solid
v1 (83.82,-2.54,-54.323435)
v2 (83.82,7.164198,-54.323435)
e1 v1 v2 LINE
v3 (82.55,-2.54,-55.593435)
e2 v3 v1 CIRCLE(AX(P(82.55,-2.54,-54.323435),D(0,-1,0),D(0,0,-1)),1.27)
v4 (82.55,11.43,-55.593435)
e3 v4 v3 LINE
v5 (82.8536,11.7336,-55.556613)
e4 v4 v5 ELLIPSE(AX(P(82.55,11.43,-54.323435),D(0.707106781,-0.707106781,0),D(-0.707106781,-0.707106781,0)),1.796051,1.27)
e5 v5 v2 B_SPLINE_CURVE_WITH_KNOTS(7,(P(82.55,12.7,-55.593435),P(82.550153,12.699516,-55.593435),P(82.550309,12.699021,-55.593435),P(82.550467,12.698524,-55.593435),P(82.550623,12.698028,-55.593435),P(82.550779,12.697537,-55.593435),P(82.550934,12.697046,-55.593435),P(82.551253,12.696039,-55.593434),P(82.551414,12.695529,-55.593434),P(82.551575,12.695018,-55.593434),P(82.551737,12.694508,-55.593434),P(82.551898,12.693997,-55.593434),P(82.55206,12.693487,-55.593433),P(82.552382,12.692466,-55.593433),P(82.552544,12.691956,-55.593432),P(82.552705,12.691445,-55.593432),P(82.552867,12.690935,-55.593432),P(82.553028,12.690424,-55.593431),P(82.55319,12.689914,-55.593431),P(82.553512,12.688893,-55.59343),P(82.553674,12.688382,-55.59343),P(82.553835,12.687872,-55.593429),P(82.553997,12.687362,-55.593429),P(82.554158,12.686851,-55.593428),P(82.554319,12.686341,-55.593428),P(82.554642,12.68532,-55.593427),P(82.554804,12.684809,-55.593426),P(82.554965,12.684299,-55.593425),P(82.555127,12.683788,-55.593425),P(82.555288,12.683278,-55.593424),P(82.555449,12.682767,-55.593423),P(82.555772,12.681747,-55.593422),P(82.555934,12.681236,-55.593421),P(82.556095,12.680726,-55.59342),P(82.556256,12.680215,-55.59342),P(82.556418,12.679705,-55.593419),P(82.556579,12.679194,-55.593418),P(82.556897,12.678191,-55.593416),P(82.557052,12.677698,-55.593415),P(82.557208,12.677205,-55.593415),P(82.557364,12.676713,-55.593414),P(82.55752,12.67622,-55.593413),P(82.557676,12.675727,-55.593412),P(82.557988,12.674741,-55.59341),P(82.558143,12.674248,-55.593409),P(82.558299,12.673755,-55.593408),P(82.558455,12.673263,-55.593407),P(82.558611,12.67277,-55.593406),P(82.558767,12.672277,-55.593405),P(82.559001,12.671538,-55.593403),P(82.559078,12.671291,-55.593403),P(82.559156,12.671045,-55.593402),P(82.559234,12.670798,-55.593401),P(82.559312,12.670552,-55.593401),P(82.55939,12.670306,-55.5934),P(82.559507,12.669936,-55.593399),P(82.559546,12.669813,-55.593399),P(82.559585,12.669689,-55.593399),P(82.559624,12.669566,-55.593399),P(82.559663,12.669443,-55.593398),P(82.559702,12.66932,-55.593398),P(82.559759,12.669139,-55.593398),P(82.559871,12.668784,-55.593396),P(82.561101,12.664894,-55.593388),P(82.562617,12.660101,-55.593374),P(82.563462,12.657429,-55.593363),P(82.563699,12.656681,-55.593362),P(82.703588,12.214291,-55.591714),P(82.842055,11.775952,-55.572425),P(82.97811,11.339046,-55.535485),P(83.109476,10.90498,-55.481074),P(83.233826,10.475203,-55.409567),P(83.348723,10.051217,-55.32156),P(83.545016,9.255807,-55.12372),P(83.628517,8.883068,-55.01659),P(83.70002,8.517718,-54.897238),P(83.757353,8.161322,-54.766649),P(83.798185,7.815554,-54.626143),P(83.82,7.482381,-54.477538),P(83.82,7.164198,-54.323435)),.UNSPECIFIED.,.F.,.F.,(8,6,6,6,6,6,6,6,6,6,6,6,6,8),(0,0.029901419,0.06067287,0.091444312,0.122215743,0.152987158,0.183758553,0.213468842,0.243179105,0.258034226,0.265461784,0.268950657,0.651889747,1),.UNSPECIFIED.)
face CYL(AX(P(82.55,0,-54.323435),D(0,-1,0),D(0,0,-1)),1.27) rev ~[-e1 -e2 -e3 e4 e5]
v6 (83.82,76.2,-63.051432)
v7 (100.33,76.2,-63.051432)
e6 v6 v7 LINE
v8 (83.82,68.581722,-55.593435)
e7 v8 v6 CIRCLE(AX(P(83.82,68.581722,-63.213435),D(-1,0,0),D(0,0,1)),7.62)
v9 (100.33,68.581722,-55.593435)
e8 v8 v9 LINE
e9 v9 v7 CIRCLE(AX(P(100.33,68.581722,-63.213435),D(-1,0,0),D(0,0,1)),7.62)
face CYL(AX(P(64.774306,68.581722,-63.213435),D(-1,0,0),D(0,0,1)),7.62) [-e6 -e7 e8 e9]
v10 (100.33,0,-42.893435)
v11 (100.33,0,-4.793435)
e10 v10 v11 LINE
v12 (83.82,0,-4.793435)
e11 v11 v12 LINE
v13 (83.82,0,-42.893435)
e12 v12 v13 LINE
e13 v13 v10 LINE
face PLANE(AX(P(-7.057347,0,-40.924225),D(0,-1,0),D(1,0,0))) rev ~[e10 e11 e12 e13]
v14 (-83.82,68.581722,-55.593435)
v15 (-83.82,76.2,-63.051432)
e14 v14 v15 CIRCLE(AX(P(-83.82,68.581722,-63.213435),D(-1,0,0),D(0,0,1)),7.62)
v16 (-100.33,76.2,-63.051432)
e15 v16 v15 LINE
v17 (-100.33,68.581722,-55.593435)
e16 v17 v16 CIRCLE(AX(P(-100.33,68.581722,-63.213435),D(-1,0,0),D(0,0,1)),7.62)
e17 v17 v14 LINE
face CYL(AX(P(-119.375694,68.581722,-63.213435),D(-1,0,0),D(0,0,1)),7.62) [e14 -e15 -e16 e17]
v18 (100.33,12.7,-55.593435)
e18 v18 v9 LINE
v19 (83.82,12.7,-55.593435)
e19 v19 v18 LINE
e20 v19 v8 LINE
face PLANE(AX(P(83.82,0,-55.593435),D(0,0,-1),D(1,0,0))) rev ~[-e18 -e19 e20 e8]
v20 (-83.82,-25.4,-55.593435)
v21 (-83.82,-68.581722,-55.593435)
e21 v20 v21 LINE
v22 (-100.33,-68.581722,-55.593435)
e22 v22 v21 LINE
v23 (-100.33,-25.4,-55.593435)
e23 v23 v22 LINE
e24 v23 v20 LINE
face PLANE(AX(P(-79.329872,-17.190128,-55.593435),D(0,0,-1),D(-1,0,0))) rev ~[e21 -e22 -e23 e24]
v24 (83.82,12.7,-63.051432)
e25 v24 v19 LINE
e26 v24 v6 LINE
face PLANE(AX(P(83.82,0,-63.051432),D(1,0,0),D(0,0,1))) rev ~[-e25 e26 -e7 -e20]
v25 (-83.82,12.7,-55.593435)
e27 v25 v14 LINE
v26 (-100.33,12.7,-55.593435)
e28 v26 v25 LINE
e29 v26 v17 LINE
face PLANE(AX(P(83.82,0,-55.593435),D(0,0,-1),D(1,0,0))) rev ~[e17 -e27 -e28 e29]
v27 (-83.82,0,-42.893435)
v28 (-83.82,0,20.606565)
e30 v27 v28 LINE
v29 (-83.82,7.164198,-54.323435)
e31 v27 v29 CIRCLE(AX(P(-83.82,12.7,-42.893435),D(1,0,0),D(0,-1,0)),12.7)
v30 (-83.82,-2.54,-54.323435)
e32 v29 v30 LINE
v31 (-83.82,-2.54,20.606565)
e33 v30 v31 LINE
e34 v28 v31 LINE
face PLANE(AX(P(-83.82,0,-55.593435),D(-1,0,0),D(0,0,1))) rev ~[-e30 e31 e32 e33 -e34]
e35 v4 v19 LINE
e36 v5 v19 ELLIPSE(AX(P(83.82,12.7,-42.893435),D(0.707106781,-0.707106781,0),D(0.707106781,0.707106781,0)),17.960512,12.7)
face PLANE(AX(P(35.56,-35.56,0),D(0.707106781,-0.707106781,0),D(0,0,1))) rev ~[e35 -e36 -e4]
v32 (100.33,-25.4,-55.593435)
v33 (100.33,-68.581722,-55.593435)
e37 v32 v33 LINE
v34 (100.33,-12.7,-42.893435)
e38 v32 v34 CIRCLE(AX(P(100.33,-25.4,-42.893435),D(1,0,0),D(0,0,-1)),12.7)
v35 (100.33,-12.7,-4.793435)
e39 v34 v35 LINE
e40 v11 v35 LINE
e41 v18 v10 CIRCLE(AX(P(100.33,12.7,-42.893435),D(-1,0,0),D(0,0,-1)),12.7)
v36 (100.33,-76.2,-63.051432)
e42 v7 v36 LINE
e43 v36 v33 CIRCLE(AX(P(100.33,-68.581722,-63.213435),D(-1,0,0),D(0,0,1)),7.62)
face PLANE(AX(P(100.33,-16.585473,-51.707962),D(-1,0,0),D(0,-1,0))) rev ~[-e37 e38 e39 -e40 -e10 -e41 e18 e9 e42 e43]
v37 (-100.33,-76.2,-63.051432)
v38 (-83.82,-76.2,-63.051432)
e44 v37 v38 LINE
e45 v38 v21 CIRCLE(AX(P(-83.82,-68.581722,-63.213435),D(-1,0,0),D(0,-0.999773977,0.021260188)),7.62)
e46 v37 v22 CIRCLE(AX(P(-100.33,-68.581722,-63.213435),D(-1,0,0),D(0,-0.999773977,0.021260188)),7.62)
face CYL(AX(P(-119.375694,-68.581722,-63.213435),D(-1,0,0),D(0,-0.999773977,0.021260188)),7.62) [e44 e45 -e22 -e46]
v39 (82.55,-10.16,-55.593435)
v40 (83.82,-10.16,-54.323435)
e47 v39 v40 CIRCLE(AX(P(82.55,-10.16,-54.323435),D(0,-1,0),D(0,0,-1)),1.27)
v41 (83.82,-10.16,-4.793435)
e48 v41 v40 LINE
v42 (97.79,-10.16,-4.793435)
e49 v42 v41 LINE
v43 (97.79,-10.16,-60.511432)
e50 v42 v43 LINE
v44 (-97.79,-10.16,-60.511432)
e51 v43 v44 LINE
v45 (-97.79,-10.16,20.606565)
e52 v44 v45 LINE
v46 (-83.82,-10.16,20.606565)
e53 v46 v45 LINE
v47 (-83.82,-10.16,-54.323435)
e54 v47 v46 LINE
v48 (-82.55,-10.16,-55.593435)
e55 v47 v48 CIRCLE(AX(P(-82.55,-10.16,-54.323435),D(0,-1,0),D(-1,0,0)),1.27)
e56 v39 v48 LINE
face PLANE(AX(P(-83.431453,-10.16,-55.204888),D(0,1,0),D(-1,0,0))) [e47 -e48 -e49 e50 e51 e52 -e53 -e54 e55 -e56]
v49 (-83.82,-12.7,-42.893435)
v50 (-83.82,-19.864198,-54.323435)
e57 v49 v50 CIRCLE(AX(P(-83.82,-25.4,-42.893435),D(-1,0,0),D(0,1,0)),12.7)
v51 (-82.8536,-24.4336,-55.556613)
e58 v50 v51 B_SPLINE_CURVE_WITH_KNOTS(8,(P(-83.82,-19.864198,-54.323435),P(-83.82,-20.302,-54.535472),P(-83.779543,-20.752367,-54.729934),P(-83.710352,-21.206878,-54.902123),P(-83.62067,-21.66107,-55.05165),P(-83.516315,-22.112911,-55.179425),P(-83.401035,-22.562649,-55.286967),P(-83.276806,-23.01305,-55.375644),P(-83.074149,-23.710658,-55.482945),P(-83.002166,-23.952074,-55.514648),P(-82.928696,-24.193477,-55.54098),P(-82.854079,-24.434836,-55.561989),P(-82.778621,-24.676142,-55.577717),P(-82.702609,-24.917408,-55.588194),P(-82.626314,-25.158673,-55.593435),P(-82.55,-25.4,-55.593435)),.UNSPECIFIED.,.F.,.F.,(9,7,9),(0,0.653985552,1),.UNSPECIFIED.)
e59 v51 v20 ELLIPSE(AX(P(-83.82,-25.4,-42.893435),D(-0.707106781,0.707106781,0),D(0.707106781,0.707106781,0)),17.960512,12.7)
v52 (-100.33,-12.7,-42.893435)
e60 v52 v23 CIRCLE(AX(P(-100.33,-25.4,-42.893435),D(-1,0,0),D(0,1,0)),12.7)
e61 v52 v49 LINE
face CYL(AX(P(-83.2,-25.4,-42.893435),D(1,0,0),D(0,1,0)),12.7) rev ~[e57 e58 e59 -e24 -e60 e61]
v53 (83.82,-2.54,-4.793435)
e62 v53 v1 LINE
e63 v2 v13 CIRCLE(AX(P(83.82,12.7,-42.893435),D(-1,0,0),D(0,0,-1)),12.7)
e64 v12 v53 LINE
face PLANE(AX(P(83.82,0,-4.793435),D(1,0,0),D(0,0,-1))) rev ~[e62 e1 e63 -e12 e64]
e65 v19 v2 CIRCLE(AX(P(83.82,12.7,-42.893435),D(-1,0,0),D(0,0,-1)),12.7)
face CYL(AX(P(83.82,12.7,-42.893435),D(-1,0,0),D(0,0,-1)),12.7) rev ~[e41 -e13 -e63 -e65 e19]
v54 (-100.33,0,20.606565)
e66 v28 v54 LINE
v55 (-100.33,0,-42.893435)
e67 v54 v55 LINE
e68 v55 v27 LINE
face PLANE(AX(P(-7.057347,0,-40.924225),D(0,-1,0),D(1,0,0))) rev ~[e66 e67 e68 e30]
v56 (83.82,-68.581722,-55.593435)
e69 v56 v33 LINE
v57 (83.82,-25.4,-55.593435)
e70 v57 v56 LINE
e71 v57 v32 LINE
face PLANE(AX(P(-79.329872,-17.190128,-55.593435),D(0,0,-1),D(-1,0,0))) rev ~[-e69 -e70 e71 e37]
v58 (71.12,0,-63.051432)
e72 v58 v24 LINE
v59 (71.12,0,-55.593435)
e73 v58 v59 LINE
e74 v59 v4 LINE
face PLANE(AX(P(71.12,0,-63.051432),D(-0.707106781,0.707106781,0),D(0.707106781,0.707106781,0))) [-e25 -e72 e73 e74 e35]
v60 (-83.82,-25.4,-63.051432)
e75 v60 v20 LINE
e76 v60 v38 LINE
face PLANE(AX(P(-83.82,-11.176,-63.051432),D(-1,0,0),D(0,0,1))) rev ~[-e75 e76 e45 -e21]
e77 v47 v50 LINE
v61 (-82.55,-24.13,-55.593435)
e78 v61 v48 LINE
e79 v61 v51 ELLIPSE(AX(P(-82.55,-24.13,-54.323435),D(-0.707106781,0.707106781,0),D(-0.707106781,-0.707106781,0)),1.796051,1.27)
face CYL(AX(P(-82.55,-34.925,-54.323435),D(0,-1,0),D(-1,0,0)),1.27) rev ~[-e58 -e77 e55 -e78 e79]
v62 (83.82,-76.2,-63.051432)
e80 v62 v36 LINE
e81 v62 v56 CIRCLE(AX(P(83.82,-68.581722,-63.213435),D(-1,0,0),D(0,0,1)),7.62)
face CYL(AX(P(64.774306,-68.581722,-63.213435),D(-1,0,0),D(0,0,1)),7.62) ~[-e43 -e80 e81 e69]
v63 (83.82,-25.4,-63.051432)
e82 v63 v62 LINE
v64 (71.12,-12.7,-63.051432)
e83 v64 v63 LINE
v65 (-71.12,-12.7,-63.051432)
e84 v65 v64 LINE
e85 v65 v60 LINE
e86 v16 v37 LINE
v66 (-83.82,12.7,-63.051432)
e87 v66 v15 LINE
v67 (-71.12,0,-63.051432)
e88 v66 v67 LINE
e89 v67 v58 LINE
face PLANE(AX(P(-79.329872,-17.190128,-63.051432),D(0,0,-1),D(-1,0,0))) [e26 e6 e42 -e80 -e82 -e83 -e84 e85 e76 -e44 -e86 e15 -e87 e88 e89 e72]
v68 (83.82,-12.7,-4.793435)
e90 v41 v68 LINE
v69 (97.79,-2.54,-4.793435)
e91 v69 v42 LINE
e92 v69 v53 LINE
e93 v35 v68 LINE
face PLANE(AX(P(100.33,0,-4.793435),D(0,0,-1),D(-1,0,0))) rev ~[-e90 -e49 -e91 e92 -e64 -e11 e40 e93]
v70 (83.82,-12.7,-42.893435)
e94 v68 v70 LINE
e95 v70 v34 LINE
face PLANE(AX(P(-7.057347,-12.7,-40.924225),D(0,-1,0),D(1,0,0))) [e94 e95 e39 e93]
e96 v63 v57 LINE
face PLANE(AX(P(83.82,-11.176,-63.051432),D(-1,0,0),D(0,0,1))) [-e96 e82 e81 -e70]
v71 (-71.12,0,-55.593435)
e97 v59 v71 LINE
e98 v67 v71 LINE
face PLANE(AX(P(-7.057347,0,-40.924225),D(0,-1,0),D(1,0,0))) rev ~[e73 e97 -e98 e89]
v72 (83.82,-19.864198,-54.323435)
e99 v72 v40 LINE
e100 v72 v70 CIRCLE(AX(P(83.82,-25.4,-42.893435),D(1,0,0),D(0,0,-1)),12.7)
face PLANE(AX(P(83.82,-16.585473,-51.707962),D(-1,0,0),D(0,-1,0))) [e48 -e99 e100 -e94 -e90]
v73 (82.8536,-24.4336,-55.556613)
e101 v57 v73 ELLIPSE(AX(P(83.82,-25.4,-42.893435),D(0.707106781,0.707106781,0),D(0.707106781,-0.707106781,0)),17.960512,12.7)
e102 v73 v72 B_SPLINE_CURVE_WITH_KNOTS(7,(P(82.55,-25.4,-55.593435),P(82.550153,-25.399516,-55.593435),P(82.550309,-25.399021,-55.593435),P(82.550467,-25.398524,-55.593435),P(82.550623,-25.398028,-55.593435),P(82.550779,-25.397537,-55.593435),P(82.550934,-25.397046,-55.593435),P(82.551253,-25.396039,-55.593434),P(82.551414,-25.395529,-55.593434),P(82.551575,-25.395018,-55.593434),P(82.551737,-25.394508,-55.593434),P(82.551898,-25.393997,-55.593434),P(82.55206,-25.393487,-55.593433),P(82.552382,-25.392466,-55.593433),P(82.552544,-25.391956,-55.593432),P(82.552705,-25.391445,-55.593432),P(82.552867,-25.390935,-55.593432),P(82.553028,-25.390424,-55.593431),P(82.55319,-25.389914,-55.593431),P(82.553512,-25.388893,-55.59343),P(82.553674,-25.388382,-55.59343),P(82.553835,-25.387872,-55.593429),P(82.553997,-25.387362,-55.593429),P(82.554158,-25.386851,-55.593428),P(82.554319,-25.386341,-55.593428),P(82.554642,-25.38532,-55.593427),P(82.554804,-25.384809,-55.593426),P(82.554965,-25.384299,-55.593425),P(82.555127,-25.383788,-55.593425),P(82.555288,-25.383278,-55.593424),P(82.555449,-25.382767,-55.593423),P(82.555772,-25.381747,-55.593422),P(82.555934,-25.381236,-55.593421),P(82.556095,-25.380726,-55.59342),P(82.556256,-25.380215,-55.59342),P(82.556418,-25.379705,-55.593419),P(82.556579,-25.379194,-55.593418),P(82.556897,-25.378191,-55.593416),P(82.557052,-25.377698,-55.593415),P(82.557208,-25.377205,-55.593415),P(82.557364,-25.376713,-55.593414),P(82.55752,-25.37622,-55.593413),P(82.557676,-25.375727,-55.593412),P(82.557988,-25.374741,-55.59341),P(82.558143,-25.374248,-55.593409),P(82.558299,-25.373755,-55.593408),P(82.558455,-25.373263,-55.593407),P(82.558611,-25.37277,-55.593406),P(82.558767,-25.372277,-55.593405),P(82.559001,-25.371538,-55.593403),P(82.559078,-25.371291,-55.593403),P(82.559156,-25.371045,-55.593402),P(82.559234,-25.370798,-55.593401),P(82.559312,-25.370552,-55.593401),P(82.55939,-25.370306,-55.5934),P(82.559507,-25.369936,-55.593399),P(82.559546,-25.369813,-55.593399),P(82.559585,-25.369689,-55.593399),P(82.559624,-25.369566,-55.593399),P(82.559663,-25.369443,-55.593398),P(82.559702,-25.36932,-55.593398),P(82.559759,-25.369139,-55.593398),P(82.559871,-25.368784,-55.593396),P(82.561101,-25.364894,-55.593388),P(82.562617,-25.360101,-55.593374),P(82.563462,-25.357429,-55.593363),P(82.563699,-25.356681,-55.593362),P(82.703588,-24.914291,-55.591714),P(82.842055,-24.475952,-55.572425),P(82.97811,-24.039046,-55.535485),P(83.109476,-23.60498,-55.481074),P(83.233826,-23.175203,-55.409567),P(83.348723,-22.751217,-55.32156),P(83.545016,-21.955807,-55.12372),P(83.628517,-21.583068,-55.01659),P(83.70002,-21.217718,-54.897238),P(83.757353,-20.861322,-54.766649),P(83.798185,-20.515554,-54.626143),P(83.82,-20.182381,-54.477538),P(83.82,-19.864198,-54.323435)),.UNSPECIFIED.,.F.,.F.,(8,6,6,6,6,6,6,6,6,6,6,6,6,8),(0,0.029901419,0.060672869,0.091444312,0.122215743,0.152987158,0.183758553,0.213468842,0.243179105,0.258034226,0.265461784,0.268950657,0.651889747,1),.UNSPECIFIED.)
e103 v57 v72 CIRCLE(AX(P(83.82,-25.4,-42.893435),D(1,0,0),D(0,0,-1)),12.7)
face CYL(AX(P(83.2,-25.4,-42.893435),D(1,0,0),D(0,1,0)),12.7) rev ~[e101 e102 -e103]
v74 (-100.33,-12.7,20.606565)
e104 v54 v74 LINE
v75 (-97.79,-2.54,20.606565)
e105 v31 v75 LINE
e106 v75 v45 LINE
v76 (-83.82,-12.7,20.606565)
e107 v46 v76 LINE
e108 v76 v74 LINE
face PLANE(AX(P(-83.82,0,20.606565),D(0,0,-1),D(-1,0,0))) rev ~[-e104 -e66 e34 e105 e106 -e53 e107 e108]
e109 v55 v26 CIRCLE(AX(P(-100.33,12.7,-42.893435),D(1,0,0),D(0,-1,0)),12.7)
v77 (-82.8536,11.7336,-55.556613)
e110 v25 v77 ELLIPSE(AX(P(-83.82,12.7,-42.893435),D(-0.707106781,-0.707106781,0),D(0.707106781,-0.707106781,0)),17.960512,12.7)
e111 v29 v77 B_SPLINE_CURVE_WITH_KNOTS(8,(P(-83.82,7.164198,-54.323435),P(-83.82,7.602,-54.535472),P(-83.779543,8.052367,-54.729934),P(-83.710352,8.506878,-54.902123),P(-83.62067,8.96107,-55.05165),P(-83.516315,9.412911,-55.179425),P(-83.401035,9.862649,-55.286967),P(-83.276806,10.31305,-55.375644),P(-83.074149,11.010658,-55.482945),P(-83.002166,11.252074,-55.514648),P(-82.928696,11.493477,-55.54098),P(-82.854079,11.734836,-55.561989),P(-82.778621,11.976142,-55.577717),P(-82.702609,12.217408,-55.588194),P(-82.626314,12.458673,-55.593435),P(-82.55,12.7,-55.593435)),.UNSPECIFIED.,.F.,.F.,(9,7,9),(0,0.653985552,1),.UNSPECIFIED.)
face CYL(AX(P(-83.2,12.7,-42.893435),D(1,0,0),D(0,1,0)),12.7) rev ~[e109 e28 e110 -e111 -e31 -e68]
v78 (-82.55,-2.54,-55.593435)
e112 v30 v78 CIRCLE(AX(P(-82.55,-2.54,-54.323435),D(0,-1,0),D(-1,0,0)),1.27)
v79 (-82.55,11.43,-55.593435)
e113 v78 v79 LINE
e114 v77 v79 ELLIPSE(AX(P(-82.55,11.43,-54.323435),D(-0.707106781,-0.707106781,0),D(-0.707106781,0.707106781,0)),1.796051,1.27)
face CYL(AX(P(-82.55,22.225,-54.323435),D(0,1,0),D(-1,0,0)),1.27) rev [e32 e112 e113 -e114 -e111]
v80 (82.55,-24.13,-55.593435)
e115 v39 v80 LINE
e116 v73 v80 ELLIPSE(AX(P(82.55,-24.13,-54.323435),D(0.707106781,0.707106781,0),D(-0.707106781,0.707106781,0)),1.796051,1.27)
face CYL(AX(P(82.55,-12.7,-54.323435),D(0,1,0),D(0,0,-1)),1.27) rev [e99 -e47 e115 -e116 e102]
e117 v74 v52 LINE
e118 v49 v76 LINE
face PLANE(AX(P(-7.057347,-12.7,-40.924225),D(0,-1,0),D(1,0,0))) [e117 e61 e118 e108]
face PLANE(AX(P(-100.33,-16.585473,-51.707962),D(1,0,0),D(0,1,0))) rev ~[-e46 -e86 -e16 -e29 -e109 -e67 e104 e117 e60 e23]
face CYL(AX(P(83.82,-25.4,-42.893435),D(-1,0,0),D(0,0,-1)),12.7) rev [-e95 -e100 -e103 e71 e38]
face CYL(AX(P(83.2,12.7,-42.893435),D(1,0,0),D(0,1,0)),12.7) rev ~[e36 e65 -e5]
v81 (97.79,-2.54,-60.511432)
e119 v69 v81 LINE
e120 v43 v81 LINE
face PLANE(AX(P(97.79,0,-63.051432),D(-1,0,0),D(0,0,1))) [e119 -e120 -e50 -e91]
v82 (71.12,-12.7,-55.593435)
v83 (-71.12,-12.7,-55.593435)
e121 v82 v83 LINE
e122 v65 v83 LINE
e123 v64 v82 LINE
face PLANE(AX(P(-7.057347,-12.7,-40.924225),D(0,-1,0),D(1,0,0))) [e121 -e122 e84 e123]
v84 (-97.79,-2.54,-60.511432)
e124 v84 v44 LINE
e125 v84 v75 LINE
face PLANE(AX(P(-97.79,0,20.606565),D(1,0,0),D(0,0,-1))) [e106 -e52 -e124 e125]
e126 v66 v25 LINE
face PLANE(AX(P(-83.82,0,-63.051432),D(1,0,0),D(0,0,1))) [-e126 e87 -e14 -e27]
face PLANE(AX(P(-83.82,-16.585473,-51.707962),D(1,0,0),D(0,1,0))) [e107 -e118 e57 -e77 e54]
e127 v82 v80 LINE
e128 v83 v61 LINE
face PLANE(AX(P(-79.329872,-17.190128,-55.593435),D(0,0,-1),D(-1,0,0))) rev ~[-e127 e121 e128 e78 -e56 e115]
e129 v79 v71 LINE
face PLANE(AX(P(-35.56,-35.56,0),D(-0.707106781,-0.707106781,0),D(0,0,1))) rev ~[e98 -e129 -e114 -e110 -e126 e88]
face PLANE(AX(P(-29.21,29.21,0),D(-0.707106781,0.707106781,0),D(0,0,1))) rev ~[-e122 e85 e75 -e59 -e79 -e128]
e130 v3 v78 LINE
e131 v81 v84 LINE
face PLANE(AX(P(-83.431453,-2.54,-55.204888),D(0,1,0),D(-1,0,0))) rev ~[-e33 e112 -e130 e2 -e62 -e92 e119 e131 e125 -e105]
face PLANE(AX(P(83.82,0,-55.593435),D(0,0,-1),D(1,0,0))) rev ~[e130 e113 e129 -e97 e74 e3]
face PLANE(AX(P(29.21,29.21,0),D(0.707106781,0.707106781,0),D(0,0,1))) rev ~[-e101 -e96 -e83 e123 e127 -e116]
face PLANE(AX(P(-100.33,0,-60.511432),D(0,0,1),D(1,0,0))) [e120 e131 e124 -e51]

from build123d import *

# Parameters (mm, degrees)
F0_W         = 200.66
F0_H         = 3.7321411073
F1_DEPTH     = 12.7
F2_T         = -2.54
F3_W         = 16.51
F3_H         = 7.4579973676
F4_DEPTH     = 76.2
F6_START     = 11.176
F5_W         = 16.51
F5_H         = 7.4579973676
F6_DEPTH     = 65.024
F7_T1_DEPTH  = 7.4579973676
F8_T1_DEPTH  = 16.51
F8_T3_DEPTH  = 16.51
F9_T1_DEPTH  = 2.54
F9_T3_DEPTH  = 2.54
F9_T8_DEPTH  = 22.225
F9_S9_R      = 12.6999999999
F9_T10_DEPTH = 13
F9_T15_DEPTH = 22.225
F9_S16_R     = 12.6999999999
F9_T17_DEPTH = 13
F9_T22_DEPTH = 22.225
F9_S24_R     = 12.6999999999
F9_T25_DEPTH = 13
F9_T29_DEPTH = 22.225
F9_S31_R     = 12.6999999999
F9_T32_DEPTH = 13
F10_T1_DEPTH = 54.6013885108
F10_T3_DEPTH = 54.6013885108


# Not quite as in the source:
# - a fillet or chamfer that OpenCascade refuses, or shapes differently, is made with other operations: its cross-section is extruded or revolved along the edge and cut away or added


with BuildPart() as f1:
    # F0 (on Front) → F1 (new body)
    with BuildSketch(Plane.XZ):
        Polygon((83.82, -55.5934350035), (-83.82, -55.5934350035), (-83.82, 20.6065649965), (-100.33, 20.6065649965), (-100.33, -59.3192912638), (100.33, -59.3192912638), (100.33, -4.7934350035), (83.82, -4.7934350035), align=None)
        with Locations((0, -61.1853618175)):
            Rectangle(F0_W, F0_H)
    extrude(amount=F1_DEPTH)

    # F2
    f2_openings = [f1.faces().sort_by_distance(p)[0] for p in [
        (-92.075, -6.35, 20.606565),
        (-83.82, -6.35, -17.493435),
        (0, -6.35, -55.593435),
        (92.075, -6.35, -4.793435),
        (83.82, -6.35, -30.193435),
    ]]
    offset(amount=F2_T, openings=f2_openings)

    # F3 (on Front) → F4 (join)
    with BuildSketch(Plane.XZ):
        with Locations((92.075, -59.3224336873)):
            Rectangle(F3_W, F3_H)
        with Locations((-92.075, -59.3224336873)):
            Rectangle(F3_W, F3_H)
    extrude(amount=-F4_DEPTH)

    # F5 (on Front) → F6 (join)
    with BuildSketch(Plane.XZ.offset(F6_START)):
        with Locations((-92.075, -59.3224336873)):
            Rectangle(F5_W, F5_H)
        with Locations((92.075, -59.3224336873)):
            Rectangle(F5_W, F5_H)
    extrude(amount=F6_DEPTH)

    # F7: chamfer of 12.7 on 4 edges, made by hand

    # F7_s2 → F7_t1 (join)
    with BuildSketch(Plane.XY.offset(-63.0514323711)):
        Polygon((-71.12, -12.7), (-83.82, -25.4), (-83.82, -12.7), align=None)
        Polygon((-83.82, 12.7), (-71.12, 0), (-83.82, 0), align=None)
        Polygon((71.12, 0), (83.82, 12.7), (83.82, 0), align=None)
        Polygon((71.12, -12.7), (83.82, -25.4), (83.82, -12.7), align=None)
    extrude(amount=F7_T1_DEPTH)

    # F8: fillet of radius 12.7 on 4 edges, made by hand

    # F8_s2 → F8_t1 (join)
    with BuildSketch(Plane.YZ.offset(-100.33)):
        with BuildLine():
            ThreePointArc((-12.7, -42.8934350035), (-16.4197438789, -51.8736911246), (-25.4, -55.5934350035))
            Line((-25.4, -55.5934350035), (-12.7, -55.5934350035))
            Line((-12.7, -55.5934350035), (-12.7, -42.8934350035))
        make_face()
        with BuildLine():
            ThreePointArc((0, -42.8934350035), (3.7197438789, -51.8736911246), (12.7, -55.5934350035))
            Line((12.7, -55.5934350035), (0, -55.5934350035))
            Line((0, -55.5934350035), (0, -42.8934350035))
        make_face()
    extrude(amount=F8_T1_DEPTH)

    # F8_s4 → F8_t3 (join)
    with BuildSketch(Plane.YZ.offset(83.82)):
        with BuildLine():
            ThreePointArc((-25.4, -55.5934350035), (-16.4197438789, -51.8736911246), (-12.7, -42.8934350035))
            Line((-12.7, -42.8934350035), (-12.7, -55.5934350035))
            Line((-12.7, -55.5934350035), (-25.4, -55.5934350035))
        make_face()
        with BuildLine():
            ThreePointArc((12.7, -55.5934350035), (3.7197438789, -51.8736911246), (0, -42.8934350035))
            Line((0, -42.8934350035), (0, -55.5934350035))
            Line((0, -55.5934350035), (12.7, -55.5934350035))
        make_face()
    extrude(amount=F8_T3_DEPTH)

    # F9: fillet of radius 1.27 on 8 edges, made by hand

    # F9_s2 → F9_t1 (join)
    with BuildSketch(Plane.XZ):
        with BuildLine():
            ThreePointArc((-83.82, -54.3234350035), (-83.4480256121, -55.2214606156), (-82.55, -55.5934350035))
            Line((-82.55, -55.5934350035), (-83.82, -55.5934350035))
            Line((-83.82, -55.5934350035), (-83.82, -54.3234350035))
        make_face()
        with BuildLine():
            ThreePointArc((82.55, -55.5934350035), (83.4480256121, -55.2214606156), (83.82, -54.3234350035))
            Line((83.82, -54.3234350035), (83.82, -55.5934350035))
            Line((83.82, -55.5934350035), (82.55, -55.5934350035))
        make_face()
    extrude(amount=F9_T1_DEPTH)

    # F9_s4 → F9_t3 (join)
    with BuildSketch(Plane.XZ.offset(10.16)):
        with BuildLine():
            ThreePointArc((-83.82, -54.3234350035), (-83.4480256121, -55.2214606156), (-82.55, -55.5934350035))
            Line((-82.55, -55.5934350035), (-83.82, -55.5934350035))
            Line((-83.82, -55.5934350035), (-83.82, -54.3234350035))
        make_face()
        with BuildLine():
            ThreePointArc((82.55, -55.5934350035), (83.4480256121, -55.2214606156), (83.82, -54.3234350035))
            Line((83.82, -54.3234350035), (83.82, -55.5934350035))
            Line((83.82, -55.5934350035), (82.55, -55.5934350035))
        make_face()
    extrude(amount=F9_T3_DEPTH)


with BuildPart() as f9_tool6:
    # F9_s7 → F9_t8 (new body)
    with BuildSketch(Plane.XZ.offset(-22.225)):
        with BuildLine():
            ThreePointArc((-83.82, -54.3234350035), (-83.4480256121, -55.2214606156), (-82.55, -55.5934350035))
            Line((-82.55, -55.5934350035), (-83.82, -55.5934350035))
            Line((-83.82, -55.5934350035), (-83.82, -54.3234350035))
        make_face()
    extrude(amount=F9_T8_DEPTH)

    # F9_s9 → F9_t10 (cut, symmetric)
    with BuildSketch(Plane.YZ.offset(-83.2)):
        with Locations((12.6999999999, -42.8934350036)):
            Circle(F9_S9_R)
    extrude(amount=F9_T10_DEPTH, both=True, mode=Mode.SUBTRACT)

    split(bisect_by=Plane(origin=(-35.56, -35.56, 0), x_dir=(0, 0, 1), z_dir=(-0.7071067812, -0.7071067812, 0)), keep=Keep.TOP)


with BuildPart() as f1_1:
    add(f1.part)

    # F9_t5: union F9_tool6
    add(f9_tool6.part)


with BuildPart() as f9_tool13:
    # F9_s14 → F9_t15 (new body)
    with BuildSketch(Plane.XZ.offset(34.925)):
        with BuildLine():
            ThreePointArc((-83.82, -54.3234350035), (-83.4480256121, -55.2214606156), (-82.55, -55.5934350035))
            Line((-82.55, -55.5934350035), (-83.82, -55.5934350035))
            Line((-83.82, -55.5934350035), (-83.82, -54.3234350035))
        make_face()
    extrude(amount=-F9_T15_DEPTH)

    # F9_s16 → F9_t17 (cut, symmetric)
    with BuildSketch(Plane.YZ.offset(-83.2)):
        with Locations((-25.3999999999, -42.8934350036)):
            Circle(F9_S16_R)
    extrude(amount=F9_T17_DEPTH, both=True, mode=Mode.SUBTRACT)

    split(bisect_by=Plane(origin=(-29.21, 29.21, 0), x_dir=(0, 0, 1), z_dir=(-0.7071067812, 0.7071067812, 0)), keep=Keep.TOP)


with BuildPart() as f1_2:
    add(f1_1.part)

    # F9_t12: union F9_tool13
    add(f9_tool13.part)


with BuildPart() as f9_tool20:
    # F9_s21 → F9_t22 (new body)
    with BuildSketch(Plane.XZ):
        with BuildLine():
            ThreePointArc((82.55, -55.5934350035), (83.4480256121, -55.2214606156), (83.82, -54.3234350035))
            Line((83.82, -54.3234350035), (83.82, -55.5934350035))
            Line((83.82, -55.5934350035), (82.55, -55.5934350035))
        make_face()
    extrude(amount=-F9_T22_DEPTH)

    split(bisect_by=Plane(origin=(35.56, -35.56, 0), x_dir=(0, 0, 1), z_dir=(0.7071067812, -0.7071067812, 0)), keep=Keep.TOP)

    # F9_s24 → F9_t25 (cut, symmetric)
    with BuildSketch(Plane.YZ.offset(83.2)):
        with Locations((12.6999999999, -42.8934350036)):
            Circle(F9_S24_R)
    extrude(amount=F9_T25_DEPTH, both=True, mode=Mode.SUBTRACT)


with BuildPart() as f1_3:
    add(f1_2.part)

    # F9_t19: union F9_tool20
    add(f9_tool20.part)


with BuildPart() as f9_tool27:
    # F9_s28 → F9_t29 (new body)
    with BuildSketch(Plane.XZ.offset(12.7)):
        with BuildLine():
            ThreePointArc((82.55, -55.5934350035), (83.4480256121, -55.2214606156), (83.82, -54.3234350035))
            Line((83.82, -54.3234350035), (83.82, -55.5934350035))
            Line((83.82, -55.5934350035), (82.55, -55.5934350035))
        make_face()
    extrude(amount=F9_T29_DEPTH)

    split(bisect_by=Plane(origin=(29.21, 29.21, 0), x_dir=(0, 0, 1), z_dir=(0.7071067812, 0.7071067812, 0)), keep=Keep.TOP)

    # F9_s31 → F9_t32 (cut, symmetric)
    with BuildSketch(Plane.YZ.offset(83.2)):
        with Locations((-25.3999999999, -42.8934350036)):
            Circle(F9_S31_R)
    extrude(amount=F9_T32_DEPTH, both=True, mode=Mode.SUBTRACT)


with BuildPart() as f1_4:
    add(f1_3.part)

    # F9_t26: union F9_tool27
    add(f9_tool27.part)

    # F10: fillet of radius 7.62 on 4 edges, made by hand

    # F10_s2 → F10_t1 (cut)
    with BuildSketch(Plane.YZ.offset(-119.3756942554)):
        with BuildLine():
            ThreePointArc((68.5817222978, -55.5934350035), (73.9122916831, -57.7683059849), (76.2, -63.0514323711))
            Line((76.2, -63.0514323711), (76.2, -55.5934350035))
            Line((76.2, -55.5934350035), (68.5817222978, -55.5934350035))
        make_face()
        with BuildLine():
            ThreePointArc((-76.2, -63.0514323711), (-73.9122916831, -57.7683059849), (-68.5817222978, -55.5934350035))
            Line((-68.5817222978, -55.5934350035), (-76.2, -55.5934350035))
            Line((-76.2, -55.5934350035), (-76.2, -63.0514323711))
        make_face()
    extrude(amount=F10_T1_DEPTH, mode=Mode.SUBTRACT)

    # F10_s4 → F10_t3 (cut)
    with BuildSketch(Plane.YZ.offset(64.7743057446)):
        with BuildLine():
            ThreePointArc((68.5817222978, -55.5934350035), (73.9122916831, -57.7683059849), (76.2, -63.0514323711))
            Line((76.2, -63.0514323711), (76.2, -55.5934350035))
            Line((76.2, -55.5934350035), (68.5817222978, -55.5934350035))
        make_face()
        with BuildLine():
            ThreePointArc((-68.5817222978, -55.5934350035), (-73.9122916831, -57.7683059849), (-76.2, -63.0514323711))
            Line((-76.2, -63.0514323711), (-76.2, -55.5934350035))
            Line((-76.2, -55.5934350035), (-68.5817222978, -55.5934350035))
        make_face()
    extrude(amount=F10_T3_DEPTH, mode=Mode.SUBTRACT)


solid = f1_4.part
